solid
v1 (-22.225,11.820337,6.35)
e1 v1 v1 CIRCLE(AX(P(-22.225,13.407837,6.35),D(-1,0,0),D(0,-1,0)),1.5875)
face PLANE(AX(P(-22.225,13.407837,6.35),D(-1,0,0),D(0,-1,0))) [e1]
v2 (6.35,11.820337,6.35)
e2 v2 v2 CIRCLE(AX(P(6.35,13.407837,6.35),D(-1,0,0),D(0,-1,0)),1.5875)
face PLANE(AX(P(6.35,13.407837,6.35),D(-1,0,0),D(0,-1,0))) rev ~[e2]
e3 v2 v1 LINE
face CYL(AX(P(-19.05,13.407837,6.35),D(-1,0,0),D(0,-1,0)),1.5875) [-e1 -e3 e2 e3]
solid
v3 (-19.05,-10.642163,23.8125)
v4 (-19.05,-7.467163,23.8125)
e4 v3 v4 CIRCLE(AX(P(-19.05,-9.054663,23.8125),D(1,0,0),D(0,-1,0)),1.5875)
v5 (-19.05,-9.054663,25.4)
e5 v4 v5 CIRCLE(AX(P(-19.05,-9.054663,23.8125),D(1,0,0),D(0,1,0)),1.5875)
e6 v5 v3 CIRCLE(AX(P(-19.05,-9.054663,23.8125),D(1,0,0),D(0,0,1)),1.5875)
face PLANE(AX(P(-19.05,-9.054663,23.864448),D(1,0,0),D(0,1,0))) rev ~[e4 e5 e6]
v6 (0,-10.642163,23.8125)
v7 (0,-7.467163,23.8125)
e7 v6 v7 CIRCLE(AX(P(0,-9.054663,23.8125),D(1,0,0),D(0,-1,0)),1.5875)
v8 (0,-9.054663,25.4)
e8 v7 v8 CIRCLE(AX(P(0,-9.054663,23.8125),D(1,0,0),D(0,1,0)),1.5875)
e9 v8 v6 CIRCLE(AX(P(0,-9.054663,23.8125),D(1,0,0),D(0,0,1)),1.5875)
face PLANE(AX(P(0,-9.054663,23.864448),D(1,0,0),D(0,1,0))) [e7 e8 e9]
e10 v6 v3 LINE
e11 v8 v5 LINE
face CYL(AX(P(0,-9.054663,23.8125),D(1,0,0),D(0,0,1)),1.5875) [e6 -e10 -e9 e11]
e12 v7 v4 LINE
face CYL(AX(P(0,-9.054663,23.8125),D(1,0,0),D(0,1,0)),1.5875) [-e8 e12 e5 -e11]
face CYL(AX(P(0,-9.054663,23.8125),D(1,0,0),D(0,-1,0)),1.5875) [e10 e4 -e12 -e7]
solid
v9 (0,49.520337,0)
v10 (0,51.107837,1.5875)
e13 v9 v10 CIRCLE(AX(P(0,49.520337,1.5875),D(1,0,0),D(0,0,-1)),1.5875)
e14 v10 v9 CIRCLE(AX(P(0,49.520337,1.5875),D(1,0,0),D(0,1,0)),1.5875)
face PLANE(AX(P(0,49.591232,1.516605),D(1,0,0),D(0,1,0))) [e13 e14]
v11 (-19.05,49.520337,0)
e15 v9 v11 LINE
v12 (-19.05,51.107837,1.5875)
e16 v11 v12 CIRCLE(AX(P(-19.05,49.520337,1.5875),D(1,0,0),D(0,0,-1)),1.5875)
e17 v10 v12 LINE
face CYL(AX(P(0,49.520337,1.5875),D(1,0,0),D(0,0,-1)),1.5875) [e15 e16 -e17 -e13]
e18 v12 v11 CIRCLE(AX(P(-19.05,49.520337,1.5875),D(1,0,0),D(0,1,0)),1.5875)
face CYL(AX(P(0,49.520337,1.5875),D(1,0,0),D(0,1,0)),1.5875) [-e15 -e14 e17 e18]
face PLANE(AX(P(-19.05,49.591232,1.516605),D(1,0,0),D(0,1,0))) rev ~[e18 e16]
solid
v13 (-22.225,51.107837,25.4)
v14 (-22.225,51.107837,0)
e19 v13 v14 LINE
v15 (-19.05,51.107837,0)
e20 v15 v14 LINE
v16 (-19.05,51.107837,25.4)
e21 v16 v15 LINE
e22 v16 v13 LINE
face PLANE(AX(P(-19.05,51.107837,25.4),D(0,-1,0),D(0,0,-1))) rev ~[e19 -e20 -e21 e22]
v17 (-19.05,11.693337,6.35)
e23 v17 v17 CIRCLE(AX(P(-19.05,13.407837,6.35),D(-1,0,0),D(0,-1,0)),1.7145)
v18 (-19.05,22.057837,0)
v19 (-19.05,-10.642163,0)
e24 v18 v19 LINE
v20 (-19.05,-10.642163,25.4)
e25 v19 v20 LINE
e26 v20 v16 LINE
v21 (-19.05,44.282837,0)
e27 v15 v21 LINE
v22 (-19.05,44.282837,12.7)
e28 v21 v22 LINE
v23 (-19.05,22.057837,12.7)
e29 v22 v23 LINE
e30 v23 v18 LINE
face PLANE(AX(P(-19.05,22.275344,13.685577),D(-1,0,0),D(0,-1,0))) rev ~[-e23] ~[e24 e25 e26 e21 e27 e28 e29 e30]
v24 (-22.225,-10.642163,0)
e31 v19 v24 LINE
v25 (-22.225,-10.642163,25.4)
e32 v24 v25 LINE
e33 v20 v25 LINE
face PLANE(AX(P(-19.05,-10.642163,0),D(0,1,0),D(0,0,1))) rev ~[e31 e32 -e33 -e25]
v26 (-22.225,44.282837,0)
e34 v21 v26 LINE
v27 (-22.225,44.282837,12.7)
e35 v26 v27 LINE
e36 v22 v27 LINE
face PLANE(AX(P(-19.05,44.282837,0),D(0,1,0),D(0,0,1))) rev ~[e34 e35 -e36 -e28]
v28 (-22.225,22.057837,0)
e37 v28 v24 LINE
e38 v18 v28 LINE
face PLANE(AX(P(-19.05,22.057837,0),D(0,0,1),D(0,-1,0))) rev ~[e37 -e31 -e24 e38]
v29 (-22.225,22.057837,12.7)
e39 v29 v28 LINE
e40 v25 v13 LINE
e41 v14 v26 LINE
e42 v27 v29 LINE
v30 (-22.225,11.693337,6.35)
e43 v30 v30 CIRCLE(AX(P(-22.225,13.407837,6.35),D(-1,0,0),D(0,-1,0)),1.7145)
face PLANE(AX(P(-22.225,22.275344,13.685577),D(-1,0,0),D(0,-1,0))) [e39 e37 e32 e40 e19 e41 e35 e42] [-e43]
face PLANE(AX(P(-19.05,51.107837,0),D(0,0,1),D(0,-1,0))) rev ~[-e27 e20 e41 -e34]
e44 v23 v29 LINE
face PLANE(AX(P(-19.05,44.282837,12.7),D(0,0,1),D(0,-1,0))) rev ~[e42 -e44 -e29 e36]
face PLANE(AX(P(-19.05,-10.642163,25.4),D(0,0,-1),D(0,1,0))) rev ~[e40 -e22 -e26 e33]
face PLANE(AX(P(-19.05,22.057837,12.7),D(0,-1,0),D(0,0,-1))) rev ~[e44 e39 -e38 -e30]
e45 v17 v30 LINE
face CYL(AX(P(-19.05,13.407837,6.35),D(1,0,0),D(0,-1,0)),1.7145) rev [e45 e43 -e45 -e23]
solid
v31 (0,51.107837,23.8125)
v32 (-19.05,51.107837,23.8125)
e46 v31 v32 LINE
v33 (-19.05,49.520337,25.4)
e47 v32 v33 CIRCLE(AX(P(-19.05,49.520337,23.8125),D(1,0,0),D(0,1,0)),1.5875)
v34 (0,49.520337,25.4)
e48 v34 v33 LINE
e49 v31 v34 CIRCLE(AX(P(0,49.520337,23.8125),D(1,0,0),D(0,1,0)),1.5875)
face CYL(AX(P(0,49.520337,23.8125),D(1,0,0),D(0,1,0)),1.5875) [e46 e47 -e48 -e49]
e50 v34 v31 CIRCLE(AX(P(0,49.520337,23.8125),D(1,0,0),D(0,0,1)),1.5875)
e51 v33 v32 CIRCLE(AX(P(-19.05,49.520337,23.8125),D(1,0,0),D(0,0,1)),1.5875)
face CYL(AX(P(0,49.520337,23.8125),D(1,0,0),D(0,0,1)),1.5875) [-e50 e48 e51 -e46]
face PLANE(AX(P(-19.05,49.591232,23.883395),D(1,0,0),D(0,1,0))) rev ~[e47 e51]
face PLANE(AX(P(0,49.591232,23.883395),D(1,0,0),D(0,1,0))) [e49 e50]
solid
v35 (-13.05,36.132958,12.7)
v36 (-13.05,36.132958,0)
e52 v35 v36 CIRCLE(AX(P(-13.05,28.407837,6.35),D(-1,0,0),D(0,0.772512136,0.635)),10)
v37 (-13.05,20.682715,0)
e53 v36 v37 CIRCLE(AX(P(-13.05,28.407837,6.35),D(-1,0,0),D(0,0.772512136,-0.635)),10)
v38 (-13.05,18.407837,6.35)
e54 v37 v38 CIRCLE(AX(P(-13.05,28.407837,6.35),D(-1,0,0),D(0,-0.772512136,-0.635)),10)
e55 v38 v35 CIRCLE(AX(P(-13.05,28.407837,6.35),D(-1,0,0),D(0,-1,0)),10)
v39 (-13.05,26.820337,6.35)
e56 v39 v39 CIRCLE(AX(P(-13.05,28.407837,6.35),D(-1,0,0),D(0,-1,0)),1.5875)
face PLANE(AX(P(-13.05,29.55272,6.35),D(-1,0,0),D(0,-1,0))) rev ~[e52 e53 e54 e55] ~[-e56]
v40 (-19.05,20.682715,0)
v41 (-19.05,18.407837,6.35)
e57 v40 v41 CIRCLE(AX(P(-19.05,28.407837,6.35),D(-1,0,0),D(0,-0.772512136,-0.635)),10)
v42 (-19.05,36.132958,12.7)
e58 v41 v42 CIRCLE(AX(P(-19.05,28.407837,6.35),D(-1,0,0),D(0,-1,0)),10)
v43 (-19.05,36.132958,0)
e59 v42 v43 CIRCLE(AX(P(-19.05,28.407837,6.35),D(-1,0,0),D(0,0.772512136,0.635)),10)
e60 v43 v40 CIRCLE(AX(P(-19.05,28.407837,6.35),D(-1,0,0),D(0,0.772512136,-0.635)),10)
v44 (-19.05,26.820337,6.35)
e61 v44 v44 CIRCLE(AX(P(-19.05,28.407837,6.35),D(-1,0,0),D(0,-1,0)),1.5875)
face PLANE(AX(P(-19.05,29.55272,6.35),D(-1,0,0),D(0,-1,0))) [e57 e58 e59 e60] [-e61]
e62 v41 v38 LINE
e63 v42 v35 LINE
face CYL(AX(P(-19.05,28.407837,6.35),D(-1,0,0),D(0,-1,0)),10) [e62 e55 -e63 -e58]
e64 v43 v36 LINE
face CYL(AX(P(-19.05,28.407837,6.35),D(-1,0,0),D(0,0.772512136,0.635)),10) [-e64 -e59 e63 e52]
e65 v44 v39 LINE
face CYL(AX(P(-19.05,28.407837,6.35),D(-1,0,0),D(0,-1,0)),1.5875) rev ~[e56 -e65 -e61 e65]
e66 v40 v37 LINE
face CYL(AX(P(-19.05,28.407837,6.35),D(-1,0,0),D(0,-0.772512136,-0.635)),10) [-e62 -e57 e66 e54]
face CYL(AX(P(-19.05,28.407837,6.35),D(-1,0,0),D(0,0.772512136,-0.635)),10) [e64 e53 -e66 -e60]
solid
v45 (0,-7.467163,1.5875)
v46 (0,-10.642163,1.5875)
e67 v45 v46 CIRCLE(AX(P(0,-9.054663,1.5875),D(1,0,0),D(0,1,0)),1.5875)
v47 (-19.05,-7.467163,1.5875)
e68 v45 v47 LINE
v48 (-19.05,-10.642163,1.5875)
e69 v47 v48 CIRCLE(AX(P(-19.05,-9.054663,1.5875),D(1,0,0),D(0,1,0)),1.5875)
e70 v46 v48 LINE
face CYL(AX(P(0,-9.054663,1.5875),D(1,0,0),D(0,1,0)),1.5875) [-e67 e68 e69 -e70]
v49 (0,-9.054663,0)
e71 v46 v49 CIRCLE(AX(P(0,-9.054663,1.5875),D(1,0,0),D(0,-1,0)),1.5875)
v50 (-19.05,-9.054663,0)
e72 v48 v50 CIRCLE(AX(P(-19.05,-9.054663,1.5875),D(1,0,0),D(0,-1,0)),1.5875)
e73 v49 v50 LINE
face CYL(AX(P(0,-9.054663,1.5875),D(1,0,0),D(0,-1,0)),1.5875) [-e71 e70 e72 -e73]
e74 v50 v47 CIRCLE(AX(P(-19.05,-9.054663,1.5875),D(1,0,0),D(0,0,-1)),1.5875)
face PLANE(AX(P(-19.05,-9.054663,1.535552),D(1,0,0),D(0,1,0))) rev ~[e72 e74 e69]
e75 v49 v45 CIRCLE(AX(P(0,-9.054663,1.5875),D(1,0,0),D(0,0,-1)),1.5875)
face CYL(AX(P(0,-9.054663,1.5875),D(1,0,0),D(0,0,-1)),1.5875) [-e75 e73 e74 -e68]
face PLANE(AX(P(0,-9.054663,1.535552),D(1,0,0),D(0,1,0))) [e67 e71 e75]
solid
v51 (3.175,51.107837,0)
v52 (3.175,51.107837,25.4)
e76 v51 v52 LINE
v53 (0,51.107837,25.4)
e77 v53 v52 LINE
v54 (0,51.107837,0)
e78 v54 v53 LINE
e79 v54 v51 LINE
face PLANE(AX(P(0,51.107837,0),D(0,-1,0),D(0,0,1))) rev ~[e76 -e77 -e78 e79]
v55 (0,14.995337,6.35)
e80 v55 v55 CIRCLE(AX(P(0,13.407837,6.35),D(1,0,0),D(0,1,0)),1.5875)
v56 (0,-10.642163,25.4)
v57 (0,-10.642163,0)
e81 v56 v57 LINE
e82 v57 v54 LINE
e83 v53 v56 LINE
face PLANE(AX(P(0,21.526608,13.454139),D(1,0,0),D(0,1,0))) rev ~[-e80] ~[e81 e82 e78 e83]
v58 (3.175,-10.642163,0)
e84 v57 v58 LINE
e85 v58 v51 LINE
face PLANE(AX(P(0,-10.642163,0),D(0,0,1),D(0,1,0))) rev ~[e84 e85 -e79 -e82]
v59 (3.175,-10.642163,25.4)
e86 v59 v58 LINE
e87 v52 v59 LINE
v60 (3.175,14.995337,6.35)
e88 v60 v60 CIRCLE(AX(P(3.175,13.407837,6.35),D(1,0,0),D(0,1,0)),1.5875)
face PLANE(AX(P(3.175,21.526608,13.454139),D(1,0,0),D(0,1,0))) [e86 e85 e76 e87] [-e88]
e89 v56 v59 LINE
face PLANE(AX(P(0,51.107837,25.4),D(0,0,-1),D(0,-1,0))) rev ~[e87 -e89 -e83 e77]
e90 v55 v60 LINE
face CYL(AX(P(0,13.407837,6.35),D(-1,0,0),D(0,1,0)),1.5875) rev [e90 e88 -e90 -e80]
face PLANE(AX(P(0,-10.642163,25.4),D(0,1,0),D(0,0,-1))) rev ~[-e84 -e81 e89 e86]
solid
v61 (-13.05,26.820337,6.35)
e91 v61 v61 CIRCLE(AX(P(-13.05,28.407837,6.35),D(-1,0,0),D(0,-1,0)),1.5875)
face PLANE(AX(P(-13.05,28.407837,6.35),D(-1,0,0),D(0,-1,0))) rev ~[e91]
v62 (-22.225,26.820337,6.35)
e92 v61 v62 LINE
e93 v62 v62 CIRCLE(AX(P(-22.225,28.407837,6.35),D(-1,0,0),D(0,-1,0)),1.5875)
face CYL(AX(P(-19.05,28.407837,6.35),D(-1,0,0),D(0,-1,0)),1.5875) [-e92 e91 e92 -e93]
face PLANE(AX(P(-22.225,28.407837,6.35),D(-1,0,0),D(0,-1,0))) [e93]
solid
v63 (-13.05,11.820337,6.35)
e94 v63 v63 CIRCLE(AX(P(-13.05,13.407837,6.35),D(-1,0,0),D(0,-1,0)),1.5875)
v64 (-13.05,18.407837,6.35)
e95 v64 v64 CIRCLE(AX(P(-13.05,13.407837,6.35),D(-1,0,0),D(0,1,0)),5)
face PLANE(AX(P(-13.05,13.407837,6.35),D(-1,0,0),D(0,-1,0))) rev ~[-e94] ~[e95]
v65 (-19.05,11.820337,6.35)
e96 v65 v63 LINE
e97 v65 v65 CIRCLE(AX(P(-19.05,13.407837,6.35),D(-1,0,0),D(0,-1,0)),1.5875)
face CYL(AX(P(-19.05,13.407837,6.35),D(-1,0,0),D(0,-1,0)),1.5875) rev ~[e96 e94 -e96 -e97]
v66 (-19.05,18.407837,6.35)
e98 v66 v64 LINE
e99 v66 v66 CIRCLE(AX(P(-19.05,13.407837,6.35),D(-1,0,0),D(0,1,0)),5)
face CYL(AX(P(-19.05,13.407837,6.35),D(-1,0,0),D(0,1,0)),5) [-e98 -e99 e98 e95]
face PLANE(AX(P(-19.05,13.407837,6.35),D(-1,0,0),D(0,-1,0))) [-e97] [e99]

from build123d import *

# Parameters (mm, degrees)
F0_R      = 5
F0_R_2    = 1.8415
F0_R_3    = 1.5875
F1_DEPTH  = 3.175
F2_DEPTH  = 19.05
F3_R      = 1.7145
F4_DEPTH  = 3.175
F3_R_2    = 1.5875
F5_DEPTH  = 3.175
F6_DEPTH  = 6
F3_R_3    = 1.8415
F7_DEPTH  = 6
F8_DEPTH  = 3.175
F9_DEPTH  = 25.4
F10_DEPTH = 6


# Not quite as in the source:
# - a feature names something its author has since deleted; it is built from what else it names


with BuildPart() as f1:
    # F0 (on Right) → F1 (new body)
    with BuildSketch(Plane.YZ):
        with BuildLine():
            ThreePointArc((18.4078367749, 6.35), (25.0352423421, 15.7641174197), (36.1329581332, 12.7))
            Line((36.1329581332, 12.7), (44.2828367749, 12.7))
            Line((44.2828367749, 12.7), (44.2828367749, 0))
            Line((44.2828367749, 0), (49.5203367749, 0))
            ThreePointArc((49.5203367749, 0), (48.3978047598, 2.7100320151), (51.1078367749, 1.5875))
            Line((51.1078367749, 1.5875), (51.1078367749, 23.8125))
            ThreePointArc((51.1078367749, 23.8125), (48.3978047598, 22.6899679849), (49.5203367749, 25.4))
            Line((49.5203367749, 25.4), (41.8216693056, 25.4))
            Line((41.8216693056, 25.4), (35.8211970083, 25.4))
            Line((35.8211970083, 25.4), (-9.0546632251, 25.4))
            ThreePointArc((-9.0546632251, 25.4), (-7.9321312099, 24.9350320151), (-7.4671632251, 23.8125))
            ThreePointArc((-7.4671632251, 23.8125), (-9.0546632251, 22.225), (-10.6421632251, 23.8125))
            Line((-10.6421632251, 23.8125), (-10.6421632251, 1.5875))
            ThreePointArc((-10.6421632251, 1.5875), (-9.0546632251, 3.175), (-7.4671632251, 1.5875))
            ThreePointArc((-7.4671632251, 1.5875), (-7.9321312099, 0.4649679849), (-9.0546632251, 0))
            Line((-9.0546632251, 0), (20.6827154167, 0))
            ThreePointArc((20.6827154167, 0), (18.9937193553, 2.9774055671), (18.4078367749, 6.35))
        make_face()
        with Locations((13.4078367749, 6.35)):
            Circle(F0_R, mode=Mode.SUBTRACT)
        with BuildLine():
            ThreePointArc((36.1329581332, 0), (37.8219541946, 2.9774055671), (38.4078367749, 6.35))
            ThreePointArc((38.4078367749, 6.35), (37.8219541946, 9.7225944329), (36.1329581332, 12.7))
            Line((36.1329581332, 12.7), (22.0578367749, 12.7))
            Line((22.0578367749, 12.7), (22.0578367749, 0))
            Line((22.0578367749, 0), (36.1329581332, 0))
        make_face()
        with Locations((28.4078367749, 6.35)):
            Circle(F0_R_2, mode=Mode.SUBTRACT)
        with BuildLine():
            ThreePointArc((36.1329581332, 12.7), (37.8219541946, 9.7225944329), (38.4078367749, 6.35))
            ThreePointArc((38.4078367749, 6.35), (37.8219541946, 2.9774055671), (36.1329581332, 0))
            Line((36.1329581332, 0), (43.4878367749, 0))
            Line((43.4878367749, 0), (44.2828367749, 0))
            Line((44.2828367749, 0), (44.2828367749, 12.7))
            Line((44.2828367749, 12.7), (36.1329581332, 12.7))
        make_face()
        with Locations((13.4078367749, 6.35)):
            Circle(F0_R)
        with Locations((13.4078367749, 6.35)):
            Circle(F0_R_3, mode=Mode.SUBTRACT)
        with BuildLine():
            Line((22.0578367749, 12.7), (36.1329581332, 12.7))
            ThreePointArc((36.1329581332, 12.7), (25.0352423421, 15.7641174197), (18.4078367749, 6.35))
            ThreePointArc((18.4078367749, 6.35), (18.9937193553, 2.9774055671), (20.6827154167, 0))
            Line((20.6827154167, 0), (22.0578367749, 0))
            Line((22.0578367749, 0), (22.0578367749, 12.7))
        make_face()
        with Locations((28.4078367749, 6.35)):
            Circle(F0_R_2)
        with Locations((28.4078367749, 6.35)):
            Circle(F0_R_3, mode=Mode.SUBTRACT)
        with BuildLine():
            ThreePointArc((-10.6421632251, 1.5875), (-10.1771952402, 0.4649679849), (-9.0546632251, 0))
            ThreePointArc((-9.0546632251, 0), (-7.9321312099, 0.4649679849), (-7.4671632251, 1.5875))
            ThreePointArc((-7.4671632251, 1.5875), (-9.0546632251, 3.175), (-10.6421632251, 1.5875))
        make_face()
        with BuildLine():
            ThreePointArc((51.1078367749, 1.5875), (48.3978047598, 2.7100320151), (49.5203367749, 0))
            ThreePointArc((49.5203367749, 0), (50.6428687901, 0.4649679849), (51.1078367749, 1.5875))
        make_face()
        with BuildLine():
            ThreePointArc((-9.0546632251, 25.4), (-10.1771952402, 24.9350320151), (-10.6421632251, 23.8125))
            ThreePointArc((-10.6421632251, 23.8125), (-9.0546632251, 22.225), (-7.4671632251, 23.8125))
            ThreePointArc((-7.4671632251, 23.8125), (-7.9321312099, 24.9350320151), (-9.0546632251, 25.4))
        make_face()
        with BuildLine():
            ThreePointArc((49.5203367749, 25.4), (48.3978047598, 22.6899679849), (51.1078367749, 23.8125))
            ThreePointArc((51.1078367749, 23.8125), (50.6428687901, 24.9350320151), (49.5203367749, 25.4))
        make_face()
        with Locations((28.4078367749, 6.35)):
            Circle(F0_R_3)
        with BuildLine():
            Line((-10.6421632251, 0), (-9.0546632251, 0))
            ThreePointArc((-9.0546632251, 0), (-10.1771952402, 0.4649679849), (-10.6421632251, 1.5875))
            Line((-10.6421632251, 1.5875), (-10.6421632251, 0))
        make_face()
        with BuildLine():
            ThreePointArc((51.1078367749, 1.5875), (50.6428687901, 0.4649679849), (49.5203367749, 0))
            Line((49.5203367749, 0), (50.2833090723, 0))
            Line((50.2833090723, 0), (51.1078367749, 0))
            Line((51.1078367749, 0), (51.1078367749, 1.5875))
        make_face()
        with BuildLine():
            Line((-10.6421632251, 25.4), (-10.6421632251, 23.8125))
            ThreePointArc((-10.6421632251, 23.8125), (-10.1771952402, 24.9350320151), (-9.0546632251, 25.4))
            Line((-9.0546632251, 25.4), (-10.6421632251, 25.4))
        make_face()
        with BuildLine():
            ThreePointArc((49.5203367749, 25.4), (50.6428687901, 24.9350320151), (51.1078367749, 23.8125))
            Line((51.1078367749, 23.8125), (51.1078367749, 25.4))
            Line((51.1078367749, 25.4), (49.5203367749, 25.4))
        make_face()
    extrude(amount=F1_DEPTH)


with BuildPart() as f2:
    # F0 (on Right) → F2 (new body)
    with BuildSketch(Plane.YZ):
        with BuildLine():
            ThreePointArc((-10.6421632251, 1.5875), (-10.1771952402, 0.4649679849), (-9.0546632251, 0))
            ThreePointArc((-9.0546632251, 0), (-7.9321312099, 0.4649679849), (-7.4671632251, 1.5875))
            ThreePointArc((-7.4671632251, 1.5875), (-9.0546632251, 3.175), (-10.6421632251, 1.5875))
        make_face()
    extrude(amount=-F2_DEPTH)


with BuildPart() as f2b:
    # F0 (on Right) → F2, piece 2 (new body)
    with BuildSketch(Plane.YZ):
        with BuildLine():
            ThreePointArc((51.1078367749, 1.5875), (48.3978047598, 2.7100320151), (49.5203367749, 0))
            ThreePointArc((49.5203367749, 0), (50.6428687901, 0.4649679849), (51.1078367749, 1.5875))
        make_face()
    extrude(amount=-F2_DEPTH)


with BuildPart() as f2c:
    # F0 (on Right) → F2, piece 3 (new body)
    with BuildSketch(Plane.YZ):
        with BuildLine():
            ThreePointArc((-9.0546632251, 25.4), (-10.1771952402, 24.9350320151), (-10.6421632251, 23.8125))
            ThreePointArc((-10.6421632251, 23.8125), (-9.0546632251, 22.225), (-7.4671632251, 23.8125))
            ThreePointArc((-7.4671632251, 23.8125), (-7.9321312099, 24.9350320151), (-9.0546632251, 25.4))
        make_face()
    extrude(amount=-F2_DEPTH)


with BuildPart() as f2d:
    # F0 (on Right) → F2, piece 4 (new body)
    with BuildSketch(Plane.YZ):
        with BuildLine():
            ThreePointArc((49.5203367749, 25.4), (48.3978047598, 22.6899679849), (51.1078367749, 23.8125))
            ThreePointArc((51.1078367749, 23.8125), (50.6428687901, 24.9350320151), (49.5203367749, 25.4))
        make_face()
    extrude(amount=-F2_DEPTH)


with BuildPart() as f4:
    # F3 (on face) → F4 (new body)
    with BuildSketch(Plane(origin=(-19.05, 0, 0), x_dir=(0, -1, 0), z_dir=(-1, 0, 0))):
        with BuildLine():
            Line((10.6421632251, 25.4), (-49.5203367749, 25.4))
            ThreePointArc((-49.5203367749, 25.4), (-48.3978047598, 24.9350320151), (-47.9328367749, 23.8125))
            ThreePointArc((-47.9328367749, 23.8125), (-49.5203367749, 22.225), (-51.1078367749, 23.8125))
            Line((-51.1078367749, 23.8125), (-51.1078367749, 0))
            Line((-51.1078367749, 0), (-44.2828367749, 0))
            Line((-44.2828367749, 0), (-44.2828367749, 12.7))
            Line((-44.2828367749, 12.7), (-36.1329581332, 12.7))
            ThreePointArc((-36.1329581332, 12.7), (-25.0352423421, 15.7641174197), (-18.4078367749, 6.35))
            ThreePointArc((-18.4078367749, 6.35), (-18.9937193553, 2.9774055671), (-20.6827154167, 0))
            Line((-20.6827154167, 0), (10.6421632251, 0))
            Line((10.6421632251, 0), (10.6421632251, 25.4))
        make_face()
        with BuildLine():
            ThreePointArc((-8.4078367749, 6.35), (-13.4078367749, 1.35), (-18.4078367749, 6.35))
            ThreePointArc((-18.4078367749, 6.35), (-13.4078367749, 11.35), (-8.4078367749, 6.35))
        make_face(mode=Mode.SUBTRACT)
        with BuildLine():
            ThreePointArc((-8.4078367749, 6.35), (-13.4078367749, 11.35), (-18.4078367749, 6.35))
            ThreePointArc((-18.4078367749, 6.35), (-13.4078367749, 1.35), (-8.4078367749, 6.35))
        make_face()
        with Locations((-13.4078367749, 6.35)):
            Circle(F3_R, mode=Mode.SUBTRACT)
        with BuildLine():
            Line((-22.0578367749, 0), (-20.6827154167, 0))
            ThreePointArc((-20.6827154167, 0), (-18.9937193553, 2.9774055671), (-18.4078367749, 6.35))
            ThreePointArc((-18.4078367749, 6.35), (-25.0352423421, 15.7641174197), (-36.1329581332, 12.7))
            Line((-36.1329581332, 12.7), (-22.0578367749, 12.7))
            Line((-22.0578367749, 12.7), (-22.0578367749, 6.35))
            Line((-22.0578367749, 6.35), (-22.0578367749, 0))
        make_face()
        with BuildLine():
            ThreePointArc((-47.9328367749, 23.8125), (-48.3978047598, 24.9350320151), (-49.5203367749, 25.4))
            ThreePointArc((-49.5203367749, 25.4), (-50.6428687901, 24.9350320151), (-51.1078367749, 23.8125))
            ThreePointArc((-51.1078367749, 23.8125), (-49.5203367749, 22.225), (-47.9328367749, 23.8125))
        make_face()
        with BuildLine():
            Line((-49.5203367749, 25.4), (-51.1078367749, 25.4))
            Line((-51.1078367749, 25.4), (-51.1078367749, 23.8125))
            ThreePointArc((-51.1078367749, 23.8125), (-50.6428687901, 24.9350320151), (-49.5203367749, 25.4))
        make_face()
    extrude(amount=F4_DEPTH)


with BuildPart() as f5:
    # F3 (on face) → F5 (new body)
    with BuildSketch(Plane(origin=(-19.05, 0, 0), x_dir=(0, -1, 0), z_dir=(-1, 0, 0))):
        with Locations((-28.4078367749, 6.35)):
            Circle(F3_R_2)
    extrude(amount=F5_DEPTH)

    # F3 (on face) → F6 (join)
    with BuildSketch(Plane(origin=(-19.05, 0, 0), x_dir=(0, -1, 0), z_dir=(-1, 0, 0))):
        with Locations((-28.4078367749, 6.35)):
            Circle(F3_R_2)
    extrude(amount=-F6_DEPTH)


with BuildPart() as f7:
    # F3 (on face) → F7 (new body)
    with BuildSketch(Plane(origin=(-19.05, 0, 0), x_dir=(0, -1, 0), z_dir=(-1, 0, 0))):
        with BuildLine():
            ThreePointArc((-36.1329581332, 12.7), (-38.4078367749, 6.35), (-36.1329581332, 0))
            Line((-36.1329581332, 0), (-22.0578367749, 0))
            Line((-22.0578367749, 0), (-22.0578367749, 6.35))
            Line((-22.0578367749, 6.35), (-22.0578367749, 12.7))
            Line((-22.0578367749, 12.7), (-36.1329581332, 12.7))
        make_face()
        with Locations((-28.4078367749, 6.35)):
            Circle(F3_R_3, mode=Mode.SUBTRACT)
        with BuildLine():
            Line((-22.0578367749, 0), (-20.6827154167, 0))
            ThreePointArc((-20.6827154167, 0), (-18.9937193553, 2.9774055671), (-18.4078367749, 6.35))
            ThreePointArc((-18.4078367749, 6.35), (-25.0352423421, 15.7641174197), (-36.1329581332, 12.7))
            Line((-36.1329581332, 12.7), (-22.0578367749, 12.7))
            Line((-22.0578367749, 12.7), (-22.0578367749, 6.35))
            Line((-22.0578367749, 6.35), (-22.0578367749, 0))
        make_face()
        with BuildLine():
            ThreePointArc((-36.1329581332, 0), (-28.4078367749, -3.65), (-20.6827154167, 0))
            Line((-20.6827154167, 0), (-22.0578367749, 0))
            Line((-22.0578367749, 0), (-36.1329581332, 0))
        make_face()
        with Locations((-28.4078367749, 6.35)):
            Circle(F3_R_3)
        with Locations((-28.4078367749, 6.35)):
            Circle(F3_R_2, mode=Mode.SUBTRACT)
    extrude(amount=-F7_DEPTH)


with BuildPart() as f8:
    # F3 (on face) → F8 (new body)
    with BuildSketch(Plane(origin=(-19.05, 0, 0), x_dir=(0, -1, 0), z_dir=(-1, 0, 0))):
        with Locations((-13.4078367749, 6.35)):
            Circle(F3_R_2)
    extrude(amount=F8_DEPTH)

    # F3 (on face) → F9 (join)
    with BuildSketch(Plane(origin=(-19.05, 0, 0), x_dir=(0, -1, 0), z_dir=(-1, 0, 0))):
        with Locations((-13.4078367749, 6.35)):
            Circle(F3_R_2)
    extrude(amount=-F9_DEPTH)


with BuildPart() as f10:
    # F3 (on face) → F10 (new body)
    with BuildSketch(Plane(origin=(-19.05, 0, 0), x_dir=(0, -1, 0), z_dir=(-1, 0, 0))):
        with BuildLine():
            ThreePointArc((-8.4078367749, 6.35), (-13.4078367749, 11.35), (-18.4078367749, 6.35))
            ThreePointArc((-18.4078367749, 6.35), (-13.4078367749, 1.35), (-8.4078367749, 6.35))
        make_face()
        with Locations((-13.4078367749, 6.35)):
            Circle(F3_R, mode=Mode.SUBTRACT)
        with Locations((-13.4078367749, 6.35)):
            Circle(F3_R)
        with Locations((-13.4078367749, 6.35)):
            Circle(F3_R_2, mode=Mode.SUBTRACT)
    extrude(amount=-F10_DEPTH)


solid = Compound([f1.part, f2.part, f2b.part, f2c.part, f2d.part, f4.part, f5.part, f7.part, f8.part, f10.part])
